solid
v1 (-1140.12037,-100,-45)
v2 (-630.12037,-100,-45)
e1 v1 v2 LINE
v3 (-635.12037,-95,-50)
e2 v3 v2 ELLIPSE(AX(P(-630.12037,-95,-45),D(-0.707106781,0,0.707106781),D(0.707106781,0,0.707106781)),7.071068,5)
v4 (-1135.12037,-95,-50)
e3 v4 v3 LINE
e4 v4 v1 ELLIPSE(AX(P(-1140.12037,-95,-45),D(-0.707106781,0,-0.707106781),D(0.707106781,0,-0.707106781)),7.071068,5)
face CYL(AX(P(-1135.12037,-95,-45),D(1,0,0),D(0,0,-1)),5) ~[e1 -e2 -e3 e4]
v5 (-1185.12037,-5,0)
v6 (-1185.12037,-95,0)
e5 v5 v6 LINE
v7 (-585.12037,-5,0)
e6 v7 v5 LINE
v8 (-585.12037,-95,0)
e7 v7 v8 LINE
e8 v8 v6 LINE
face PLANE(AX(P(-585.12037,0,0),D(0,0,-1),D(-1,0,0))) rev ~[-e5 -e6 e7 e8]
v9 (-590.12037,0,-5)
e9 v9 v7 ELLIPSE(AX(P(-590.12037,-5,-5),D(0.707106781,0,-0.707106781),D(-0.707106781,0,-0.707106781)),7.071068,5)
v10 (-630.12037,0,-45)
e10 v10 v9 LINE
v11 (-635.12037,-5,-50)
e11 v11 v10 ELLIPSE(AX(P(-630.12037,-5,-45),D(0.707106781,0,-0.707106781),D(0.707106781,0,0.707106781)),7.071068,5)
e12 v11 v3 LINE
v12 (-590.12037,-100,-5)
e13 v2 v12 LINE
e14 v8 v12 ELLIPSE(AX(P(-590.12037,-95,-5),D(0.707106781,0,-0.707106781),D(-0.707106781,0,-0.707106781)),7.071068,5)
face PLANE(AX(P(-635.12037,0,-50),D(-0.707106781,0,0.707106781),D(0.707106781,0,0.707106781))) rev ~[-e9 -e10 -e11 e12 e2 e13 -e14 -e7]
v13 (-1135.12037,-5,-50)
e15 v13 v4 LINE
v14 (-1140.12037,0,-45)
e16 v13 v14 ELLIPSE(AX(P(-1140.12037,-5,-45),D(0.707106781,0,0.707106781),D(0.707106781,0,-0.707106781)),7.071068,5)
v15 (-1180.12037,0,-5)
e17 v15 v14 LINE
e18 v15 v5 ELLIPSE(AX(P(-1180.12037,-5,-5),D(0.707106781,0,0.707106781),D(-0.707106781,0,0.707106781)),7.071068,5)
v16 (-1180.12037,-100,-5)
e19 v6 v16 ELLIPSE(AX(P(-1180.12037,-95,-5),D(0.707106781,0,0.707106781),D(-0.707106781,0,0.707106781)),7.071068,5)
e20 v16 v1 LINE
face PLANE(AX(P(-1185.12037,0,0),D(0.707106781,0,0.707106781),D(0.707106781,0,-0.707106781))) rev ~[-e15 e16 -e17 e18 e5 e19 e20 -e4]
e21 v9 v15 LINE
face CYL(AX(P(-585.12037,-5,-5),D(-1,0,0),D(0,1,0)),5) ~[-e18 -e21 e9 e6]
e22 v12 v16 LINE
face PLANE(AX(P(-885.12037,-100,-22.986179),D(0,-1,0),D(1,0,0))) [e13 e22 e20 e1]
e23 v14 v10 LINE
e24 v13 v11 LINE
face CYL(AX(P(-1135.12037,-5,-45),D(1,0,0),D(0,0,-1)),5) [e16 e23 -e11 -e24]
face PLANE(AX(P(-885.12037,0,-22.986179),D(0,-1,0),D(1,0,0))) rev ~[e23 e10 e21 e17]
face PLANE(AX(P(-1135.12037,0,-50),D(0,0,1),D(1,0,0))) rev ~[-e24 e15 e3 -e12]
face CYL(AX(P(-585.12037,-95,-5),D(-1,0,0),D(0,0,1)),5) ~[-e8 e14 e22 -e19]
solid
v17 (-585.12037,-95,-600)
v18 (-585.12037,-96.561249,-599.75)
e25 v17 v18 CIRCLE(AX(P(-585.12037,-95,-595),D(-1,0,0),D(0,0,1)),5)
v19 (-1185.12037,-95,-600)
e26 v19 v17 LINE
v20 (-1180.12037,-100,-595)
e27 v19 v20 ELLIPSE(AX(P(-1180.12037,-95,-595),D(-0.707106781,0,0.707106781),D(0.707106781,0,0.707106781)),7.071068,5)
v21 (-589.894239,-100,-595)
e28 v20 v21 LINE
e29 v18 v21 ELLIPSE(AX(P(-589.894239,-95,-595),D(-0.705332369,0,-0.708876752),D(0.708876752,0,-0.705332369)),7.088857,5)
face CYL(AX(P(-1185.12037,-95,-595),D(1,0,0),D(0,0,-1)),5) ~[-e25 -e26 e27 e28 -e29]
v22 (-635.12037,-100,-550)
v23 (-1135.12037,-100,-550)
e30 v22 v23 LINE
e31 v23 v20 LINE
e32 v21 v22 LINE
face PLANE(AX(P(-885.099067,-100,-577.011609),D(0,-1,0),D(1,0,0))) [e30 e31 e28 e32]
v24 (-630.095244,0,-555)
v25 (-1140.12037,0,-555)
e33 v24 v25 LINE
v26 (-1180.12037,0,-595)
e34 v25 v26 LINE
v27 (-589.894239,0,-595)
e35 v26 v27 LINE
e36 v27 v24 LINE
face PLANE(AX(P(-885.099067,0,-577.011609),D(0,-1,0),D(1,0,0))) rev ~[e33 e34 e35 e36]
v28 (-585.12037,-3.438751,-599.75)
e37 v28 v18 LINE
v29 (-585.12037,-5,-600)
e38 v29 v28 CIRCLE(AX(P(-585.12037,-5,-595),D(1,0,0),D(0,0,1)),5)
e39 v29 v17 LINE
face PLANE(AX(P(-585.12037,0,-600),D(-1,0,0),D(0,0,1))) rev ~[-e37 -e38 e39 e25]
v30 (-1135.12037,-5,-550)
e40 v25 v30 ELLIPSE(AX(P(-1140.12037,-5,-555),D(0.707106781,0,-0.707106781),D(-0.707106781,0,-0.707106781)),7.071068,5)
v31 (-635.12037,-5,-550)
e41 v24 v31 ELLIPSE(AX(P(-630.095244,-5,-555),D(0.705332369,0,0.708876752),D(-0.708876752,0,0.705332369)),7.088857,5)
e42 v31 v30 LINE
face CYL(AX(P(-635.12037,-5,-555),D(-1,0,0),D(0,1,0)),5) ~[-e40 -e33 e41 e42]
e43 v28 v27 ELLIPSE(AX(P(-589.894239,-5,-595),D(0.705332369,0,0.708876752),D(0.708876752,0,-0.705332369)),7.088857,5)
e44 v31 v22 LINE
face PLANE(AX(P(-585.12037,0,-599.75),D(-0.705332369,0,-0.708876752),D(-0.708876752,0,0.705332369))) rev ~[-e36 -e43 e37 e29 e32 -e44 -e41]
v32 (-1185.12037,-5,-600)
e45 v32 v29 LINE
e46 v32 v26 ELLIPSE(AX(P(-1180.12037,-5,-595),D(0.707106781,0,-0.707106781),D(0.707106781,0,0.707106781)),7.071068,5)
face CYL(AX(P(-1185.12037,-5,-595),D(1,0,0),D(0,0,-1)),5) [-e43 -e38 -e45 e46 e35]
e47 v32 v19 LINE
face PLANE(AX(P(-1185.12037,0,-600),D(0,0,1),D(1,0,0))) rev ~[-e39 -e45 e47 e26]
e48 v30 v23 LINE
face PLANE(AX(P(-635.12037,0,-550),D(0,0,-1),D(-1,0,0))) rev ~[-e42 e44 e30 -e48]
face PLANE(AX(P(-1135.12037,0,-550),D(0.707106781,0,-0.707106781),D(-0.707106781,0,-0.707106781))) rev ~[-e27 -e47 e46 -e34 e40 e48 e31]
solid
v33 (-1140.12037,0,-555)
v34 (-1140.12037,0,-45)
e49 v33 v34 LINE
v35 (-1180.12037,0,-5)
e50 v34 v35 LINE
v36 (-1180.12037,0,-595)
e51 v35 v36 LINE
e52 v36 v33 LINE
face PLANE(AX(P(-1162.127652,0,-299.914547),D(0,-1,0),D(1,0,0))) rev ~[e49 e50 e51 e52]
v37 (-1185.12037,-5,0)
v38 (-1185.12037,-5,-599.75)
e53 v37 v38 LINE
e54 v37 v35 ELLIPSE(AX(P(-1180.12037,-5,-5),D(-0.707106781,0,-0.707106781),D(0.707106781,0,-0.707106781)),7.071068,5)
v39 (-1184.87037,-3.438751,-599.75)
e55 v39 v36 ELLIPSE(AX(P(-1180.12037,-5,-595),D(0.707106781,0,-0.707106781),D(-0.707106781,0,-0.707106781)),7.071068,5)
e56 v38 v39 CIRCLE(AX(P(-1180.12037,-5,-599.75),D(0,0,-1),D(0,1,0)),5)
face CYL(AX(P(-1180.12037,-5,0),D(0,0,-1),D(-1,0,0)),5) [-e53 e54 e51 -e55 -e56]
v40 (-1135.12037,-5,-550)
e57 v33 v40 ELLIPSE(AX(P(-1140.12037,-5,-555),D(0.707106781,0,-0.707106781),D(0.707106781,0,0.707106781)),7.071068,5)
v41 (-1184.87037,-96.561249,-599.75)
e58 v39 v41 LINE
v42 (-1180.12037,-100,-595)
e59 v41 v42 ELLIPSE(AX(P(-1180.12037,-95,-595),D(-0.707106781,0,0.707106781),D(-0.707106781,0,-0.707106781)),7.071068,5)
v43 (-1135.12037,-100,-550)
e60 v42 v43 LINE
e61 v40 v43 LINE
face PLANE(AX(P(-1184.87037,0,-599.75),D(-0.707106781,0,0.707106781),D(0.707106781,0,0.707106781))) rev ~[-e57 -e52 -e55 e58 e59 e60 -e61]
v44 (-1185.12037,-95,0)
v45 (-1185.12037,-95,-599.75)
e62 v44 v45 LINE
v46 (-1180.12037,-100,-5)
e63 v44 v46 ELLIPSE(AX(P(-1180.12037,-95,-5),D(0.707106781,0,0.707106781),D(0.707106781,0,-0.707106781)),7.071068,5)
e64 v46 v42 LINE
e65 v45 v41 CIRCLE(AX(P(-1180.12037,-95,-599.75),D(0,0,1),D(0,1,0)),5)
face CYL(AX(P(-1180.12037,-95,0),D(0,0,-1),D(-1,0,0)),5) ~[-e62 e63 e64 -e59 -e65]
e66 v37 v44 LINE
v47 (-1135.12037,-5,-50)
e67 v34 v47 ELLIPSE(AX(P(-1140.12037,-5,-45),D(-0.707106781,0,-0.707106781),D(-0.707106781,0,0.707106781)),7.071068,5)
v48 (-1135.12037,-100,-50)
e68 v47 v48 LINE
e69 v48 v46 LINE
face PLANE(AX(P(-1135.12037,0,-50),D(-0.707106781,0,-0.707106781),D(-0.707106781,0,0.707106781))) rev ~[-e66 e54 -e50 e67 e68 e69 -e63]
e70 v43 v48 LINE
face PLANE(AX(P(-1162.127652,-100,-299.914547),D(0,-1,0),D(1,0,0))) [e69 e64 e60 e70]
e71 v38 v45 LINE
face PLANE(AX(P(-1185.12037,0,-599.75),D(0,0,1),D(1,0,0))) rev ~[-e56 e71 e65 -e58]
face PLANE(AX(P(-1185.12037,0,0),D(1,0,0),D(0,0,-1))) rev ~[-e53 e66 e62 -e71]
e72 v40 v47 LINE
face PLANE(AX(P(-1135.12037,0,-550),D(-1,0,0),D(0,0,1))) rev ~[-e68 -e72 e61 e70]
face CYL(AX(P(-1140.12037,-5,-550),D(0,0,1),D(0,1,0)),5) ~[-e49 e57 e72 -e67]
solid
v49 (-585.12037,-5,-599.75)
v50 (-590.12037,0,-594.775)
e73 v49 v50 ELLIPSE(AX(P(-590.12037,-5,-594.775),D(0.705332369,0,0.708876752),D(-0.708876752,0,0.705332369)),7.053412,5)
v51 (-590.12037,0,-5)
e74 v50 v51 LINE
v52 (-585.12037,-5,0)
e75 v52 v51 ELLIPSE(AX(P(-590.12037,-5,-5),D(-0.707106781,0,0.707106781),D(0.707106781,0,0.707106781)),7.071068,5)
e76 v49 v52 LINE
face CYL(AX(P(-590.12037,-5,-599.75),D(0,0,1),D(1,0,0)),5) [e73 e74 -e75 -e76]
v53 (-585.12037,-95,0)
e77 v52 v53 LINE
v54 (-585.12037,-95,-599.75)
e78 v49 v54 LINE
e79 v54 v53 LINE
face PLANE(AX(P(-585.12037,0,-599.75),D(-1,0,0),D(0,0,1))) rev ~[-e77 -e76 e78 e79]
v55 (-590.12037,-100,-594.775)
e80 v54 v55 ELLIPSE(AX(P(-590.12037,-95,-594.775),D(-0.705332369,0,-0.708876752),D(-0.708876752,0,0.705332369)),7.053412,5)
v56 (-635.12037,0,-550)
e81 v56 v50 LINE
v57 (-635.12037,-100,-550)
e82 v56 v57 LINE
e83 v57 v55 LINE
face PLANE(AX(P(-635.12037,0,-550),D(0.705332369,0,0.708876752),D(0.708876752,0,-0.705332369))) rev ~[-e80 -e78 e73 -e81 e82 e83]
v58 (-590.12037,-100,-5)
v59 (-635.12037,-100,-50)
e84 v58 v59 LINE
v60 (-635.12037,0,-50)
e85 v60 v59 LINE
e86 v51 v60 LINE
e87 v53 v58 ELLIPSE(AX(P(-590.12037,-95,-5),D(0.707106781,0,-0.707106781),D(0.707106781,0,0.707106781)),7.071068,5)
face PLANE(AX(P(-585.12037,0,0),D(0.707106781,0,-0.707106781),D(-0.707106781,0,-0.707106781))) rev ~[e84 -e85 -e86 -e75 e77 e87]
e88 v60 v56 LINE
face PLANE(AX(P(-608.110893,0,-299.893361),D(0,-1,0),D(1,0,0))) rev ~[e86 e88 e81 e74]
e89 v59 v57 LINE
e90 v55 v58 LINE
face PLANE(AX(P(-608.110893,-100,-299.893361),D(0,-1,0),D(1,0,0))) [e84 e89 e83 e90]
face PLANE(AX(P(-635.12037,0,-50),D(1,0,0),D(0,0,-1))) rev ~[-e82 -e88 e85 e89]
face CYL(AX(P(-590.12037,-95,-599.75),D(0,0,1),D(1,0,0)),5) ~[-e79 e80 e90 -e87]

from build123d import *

# Parameters (mm, degrees)
F0_DEPTH = 100
F7_DEPTH = 100
F1_DEPTH = 100
F2_DEPTH = 100
F3_R     = 5
F3_2_R   = 5
F3_3_R   = 5
F4_R     = 5
F8_R     = 5
F5_R     = 5
F5_2_R   = 5
F5_3_R   = 5
F5_4_R   = 5


# Not quite as in the source:
# - a feature names something its author has since deleted; it is built from what else it names


with BuildPart() as f0:
    # F6 (on Front) → F0 (new body)
    with BuildSketch(Plane.XZ):
        Polygon((-635.1203695295, -50), (-585.1203695295, 0), (-1185.1203695295, 0), (-1135.1203695295, -50), align=None)
    extrude(amount=F0_DEPTH)

    # F3
    f3_edges = [f0.edges().sort_by_distance(p)[0] for p in [
        (-885.12037, -100, 0),
        (-885.12037, -100, -50),
    ]]
    fillet(f3_edges, radius=F3_R)

    # F5#2
    f5_2_edges = [f0.edges().sort_by_distance(p)[0] for p in [
        (-885.12037, 0, -50),
        (-885.12037, 0, 0),
    ]]
    fillet(f5_2_edges, radius=F5_2_R)


with BuildPart() as f7:
    # F6 (on Front) → F7 (new body)
    with BuildSketch(Plane.XZ):
        Polygon((-1185.1203695295, 0), (-1185.1203695295, -599.75), (-1184.8703695295, -599.75), (-1135.1203695295, -550), (-1135.1203695295, -50), align=None)
    extrude(amount=F7_DEPTH)

    # F3#2
    f3_2_edges = [f7.edges().sort_by_distance(p)[0] for p in [
        (-1185.12037, -100, -299.875),
    ]]
    fillet(f3_2_edges, radius=F3_2_R)

    # F5#3
    f5_3_edges = [f7.edges().sort_by_distance(p)[0] for p in [
        (-1185.12037, 0, -299.875),
        (-1135.12037, 0, -300),
    ]]
    fillet(f5_3_edges, radius=F5_3_R)


with BuildPart() as f1:
    # F6 (on Front) → F1 (new body)
    with BuildSketch(Plane.XZ):
        Polygon((-1135.1203695295, -600), (-585.1203695295, -600), (-585.1203695295, -599.75), (-635.1203695295, -550), (-1135.1203695295, -550), (-1184.8703695295, -599.75), (-1185.1203695295, -600), align=None)
    extrude(amount=F1_DEPTH)

    # F4
    f4_edges = [f1.edges().sort_by_distance(p)[0] for p in [
        (-885.12037, -100, -600),
    ]]
    fillet(f4_edges, radius=F4_R)

    # F8
    f8_edges = [f1.edges().sort_by_distance(p)[0] for p in [
        (-885.12037, 0, -600),
    ]]
    fillet(f8_edges, radius=F8_R)

    # F5#4
    f5_4_edges = [f1.edges().sort_by_distance(p)[0] for p in [
        (-885.12037, 0, -550),
    ]]
    fillet(f5_4_edges, radius=F5_4_R)


with BuildPart() as f2:
    # F6 (on Front) → F2 (new body)
    with BuildSketch(Plane.XZ):
        Polygon((-635.1203695295, -550), (-585.1203695295, -599.75), (-585.1203695295, 0), (-635.1203695295, -50), align=None)
    extrude(amount=F2_DEPTH)

    # F3#3
    f3_3_edges = [f2.edges().sort_by_distance(p)[0] for p in [
        (-585.12037, -100, -299.875),
    ]]
    fillet(f3_3_edges, radius=F3_3_R)

    # F5
    f5_edges = [f2.edges().sort_by_distance(p)[0] for p in [
        (-585.12037, 0, -299.875),
    ]]
    fillet(f5_edges, radius=F5_R)


solid = Compound([f0.part, f7.part, f1.part, f2.part])
